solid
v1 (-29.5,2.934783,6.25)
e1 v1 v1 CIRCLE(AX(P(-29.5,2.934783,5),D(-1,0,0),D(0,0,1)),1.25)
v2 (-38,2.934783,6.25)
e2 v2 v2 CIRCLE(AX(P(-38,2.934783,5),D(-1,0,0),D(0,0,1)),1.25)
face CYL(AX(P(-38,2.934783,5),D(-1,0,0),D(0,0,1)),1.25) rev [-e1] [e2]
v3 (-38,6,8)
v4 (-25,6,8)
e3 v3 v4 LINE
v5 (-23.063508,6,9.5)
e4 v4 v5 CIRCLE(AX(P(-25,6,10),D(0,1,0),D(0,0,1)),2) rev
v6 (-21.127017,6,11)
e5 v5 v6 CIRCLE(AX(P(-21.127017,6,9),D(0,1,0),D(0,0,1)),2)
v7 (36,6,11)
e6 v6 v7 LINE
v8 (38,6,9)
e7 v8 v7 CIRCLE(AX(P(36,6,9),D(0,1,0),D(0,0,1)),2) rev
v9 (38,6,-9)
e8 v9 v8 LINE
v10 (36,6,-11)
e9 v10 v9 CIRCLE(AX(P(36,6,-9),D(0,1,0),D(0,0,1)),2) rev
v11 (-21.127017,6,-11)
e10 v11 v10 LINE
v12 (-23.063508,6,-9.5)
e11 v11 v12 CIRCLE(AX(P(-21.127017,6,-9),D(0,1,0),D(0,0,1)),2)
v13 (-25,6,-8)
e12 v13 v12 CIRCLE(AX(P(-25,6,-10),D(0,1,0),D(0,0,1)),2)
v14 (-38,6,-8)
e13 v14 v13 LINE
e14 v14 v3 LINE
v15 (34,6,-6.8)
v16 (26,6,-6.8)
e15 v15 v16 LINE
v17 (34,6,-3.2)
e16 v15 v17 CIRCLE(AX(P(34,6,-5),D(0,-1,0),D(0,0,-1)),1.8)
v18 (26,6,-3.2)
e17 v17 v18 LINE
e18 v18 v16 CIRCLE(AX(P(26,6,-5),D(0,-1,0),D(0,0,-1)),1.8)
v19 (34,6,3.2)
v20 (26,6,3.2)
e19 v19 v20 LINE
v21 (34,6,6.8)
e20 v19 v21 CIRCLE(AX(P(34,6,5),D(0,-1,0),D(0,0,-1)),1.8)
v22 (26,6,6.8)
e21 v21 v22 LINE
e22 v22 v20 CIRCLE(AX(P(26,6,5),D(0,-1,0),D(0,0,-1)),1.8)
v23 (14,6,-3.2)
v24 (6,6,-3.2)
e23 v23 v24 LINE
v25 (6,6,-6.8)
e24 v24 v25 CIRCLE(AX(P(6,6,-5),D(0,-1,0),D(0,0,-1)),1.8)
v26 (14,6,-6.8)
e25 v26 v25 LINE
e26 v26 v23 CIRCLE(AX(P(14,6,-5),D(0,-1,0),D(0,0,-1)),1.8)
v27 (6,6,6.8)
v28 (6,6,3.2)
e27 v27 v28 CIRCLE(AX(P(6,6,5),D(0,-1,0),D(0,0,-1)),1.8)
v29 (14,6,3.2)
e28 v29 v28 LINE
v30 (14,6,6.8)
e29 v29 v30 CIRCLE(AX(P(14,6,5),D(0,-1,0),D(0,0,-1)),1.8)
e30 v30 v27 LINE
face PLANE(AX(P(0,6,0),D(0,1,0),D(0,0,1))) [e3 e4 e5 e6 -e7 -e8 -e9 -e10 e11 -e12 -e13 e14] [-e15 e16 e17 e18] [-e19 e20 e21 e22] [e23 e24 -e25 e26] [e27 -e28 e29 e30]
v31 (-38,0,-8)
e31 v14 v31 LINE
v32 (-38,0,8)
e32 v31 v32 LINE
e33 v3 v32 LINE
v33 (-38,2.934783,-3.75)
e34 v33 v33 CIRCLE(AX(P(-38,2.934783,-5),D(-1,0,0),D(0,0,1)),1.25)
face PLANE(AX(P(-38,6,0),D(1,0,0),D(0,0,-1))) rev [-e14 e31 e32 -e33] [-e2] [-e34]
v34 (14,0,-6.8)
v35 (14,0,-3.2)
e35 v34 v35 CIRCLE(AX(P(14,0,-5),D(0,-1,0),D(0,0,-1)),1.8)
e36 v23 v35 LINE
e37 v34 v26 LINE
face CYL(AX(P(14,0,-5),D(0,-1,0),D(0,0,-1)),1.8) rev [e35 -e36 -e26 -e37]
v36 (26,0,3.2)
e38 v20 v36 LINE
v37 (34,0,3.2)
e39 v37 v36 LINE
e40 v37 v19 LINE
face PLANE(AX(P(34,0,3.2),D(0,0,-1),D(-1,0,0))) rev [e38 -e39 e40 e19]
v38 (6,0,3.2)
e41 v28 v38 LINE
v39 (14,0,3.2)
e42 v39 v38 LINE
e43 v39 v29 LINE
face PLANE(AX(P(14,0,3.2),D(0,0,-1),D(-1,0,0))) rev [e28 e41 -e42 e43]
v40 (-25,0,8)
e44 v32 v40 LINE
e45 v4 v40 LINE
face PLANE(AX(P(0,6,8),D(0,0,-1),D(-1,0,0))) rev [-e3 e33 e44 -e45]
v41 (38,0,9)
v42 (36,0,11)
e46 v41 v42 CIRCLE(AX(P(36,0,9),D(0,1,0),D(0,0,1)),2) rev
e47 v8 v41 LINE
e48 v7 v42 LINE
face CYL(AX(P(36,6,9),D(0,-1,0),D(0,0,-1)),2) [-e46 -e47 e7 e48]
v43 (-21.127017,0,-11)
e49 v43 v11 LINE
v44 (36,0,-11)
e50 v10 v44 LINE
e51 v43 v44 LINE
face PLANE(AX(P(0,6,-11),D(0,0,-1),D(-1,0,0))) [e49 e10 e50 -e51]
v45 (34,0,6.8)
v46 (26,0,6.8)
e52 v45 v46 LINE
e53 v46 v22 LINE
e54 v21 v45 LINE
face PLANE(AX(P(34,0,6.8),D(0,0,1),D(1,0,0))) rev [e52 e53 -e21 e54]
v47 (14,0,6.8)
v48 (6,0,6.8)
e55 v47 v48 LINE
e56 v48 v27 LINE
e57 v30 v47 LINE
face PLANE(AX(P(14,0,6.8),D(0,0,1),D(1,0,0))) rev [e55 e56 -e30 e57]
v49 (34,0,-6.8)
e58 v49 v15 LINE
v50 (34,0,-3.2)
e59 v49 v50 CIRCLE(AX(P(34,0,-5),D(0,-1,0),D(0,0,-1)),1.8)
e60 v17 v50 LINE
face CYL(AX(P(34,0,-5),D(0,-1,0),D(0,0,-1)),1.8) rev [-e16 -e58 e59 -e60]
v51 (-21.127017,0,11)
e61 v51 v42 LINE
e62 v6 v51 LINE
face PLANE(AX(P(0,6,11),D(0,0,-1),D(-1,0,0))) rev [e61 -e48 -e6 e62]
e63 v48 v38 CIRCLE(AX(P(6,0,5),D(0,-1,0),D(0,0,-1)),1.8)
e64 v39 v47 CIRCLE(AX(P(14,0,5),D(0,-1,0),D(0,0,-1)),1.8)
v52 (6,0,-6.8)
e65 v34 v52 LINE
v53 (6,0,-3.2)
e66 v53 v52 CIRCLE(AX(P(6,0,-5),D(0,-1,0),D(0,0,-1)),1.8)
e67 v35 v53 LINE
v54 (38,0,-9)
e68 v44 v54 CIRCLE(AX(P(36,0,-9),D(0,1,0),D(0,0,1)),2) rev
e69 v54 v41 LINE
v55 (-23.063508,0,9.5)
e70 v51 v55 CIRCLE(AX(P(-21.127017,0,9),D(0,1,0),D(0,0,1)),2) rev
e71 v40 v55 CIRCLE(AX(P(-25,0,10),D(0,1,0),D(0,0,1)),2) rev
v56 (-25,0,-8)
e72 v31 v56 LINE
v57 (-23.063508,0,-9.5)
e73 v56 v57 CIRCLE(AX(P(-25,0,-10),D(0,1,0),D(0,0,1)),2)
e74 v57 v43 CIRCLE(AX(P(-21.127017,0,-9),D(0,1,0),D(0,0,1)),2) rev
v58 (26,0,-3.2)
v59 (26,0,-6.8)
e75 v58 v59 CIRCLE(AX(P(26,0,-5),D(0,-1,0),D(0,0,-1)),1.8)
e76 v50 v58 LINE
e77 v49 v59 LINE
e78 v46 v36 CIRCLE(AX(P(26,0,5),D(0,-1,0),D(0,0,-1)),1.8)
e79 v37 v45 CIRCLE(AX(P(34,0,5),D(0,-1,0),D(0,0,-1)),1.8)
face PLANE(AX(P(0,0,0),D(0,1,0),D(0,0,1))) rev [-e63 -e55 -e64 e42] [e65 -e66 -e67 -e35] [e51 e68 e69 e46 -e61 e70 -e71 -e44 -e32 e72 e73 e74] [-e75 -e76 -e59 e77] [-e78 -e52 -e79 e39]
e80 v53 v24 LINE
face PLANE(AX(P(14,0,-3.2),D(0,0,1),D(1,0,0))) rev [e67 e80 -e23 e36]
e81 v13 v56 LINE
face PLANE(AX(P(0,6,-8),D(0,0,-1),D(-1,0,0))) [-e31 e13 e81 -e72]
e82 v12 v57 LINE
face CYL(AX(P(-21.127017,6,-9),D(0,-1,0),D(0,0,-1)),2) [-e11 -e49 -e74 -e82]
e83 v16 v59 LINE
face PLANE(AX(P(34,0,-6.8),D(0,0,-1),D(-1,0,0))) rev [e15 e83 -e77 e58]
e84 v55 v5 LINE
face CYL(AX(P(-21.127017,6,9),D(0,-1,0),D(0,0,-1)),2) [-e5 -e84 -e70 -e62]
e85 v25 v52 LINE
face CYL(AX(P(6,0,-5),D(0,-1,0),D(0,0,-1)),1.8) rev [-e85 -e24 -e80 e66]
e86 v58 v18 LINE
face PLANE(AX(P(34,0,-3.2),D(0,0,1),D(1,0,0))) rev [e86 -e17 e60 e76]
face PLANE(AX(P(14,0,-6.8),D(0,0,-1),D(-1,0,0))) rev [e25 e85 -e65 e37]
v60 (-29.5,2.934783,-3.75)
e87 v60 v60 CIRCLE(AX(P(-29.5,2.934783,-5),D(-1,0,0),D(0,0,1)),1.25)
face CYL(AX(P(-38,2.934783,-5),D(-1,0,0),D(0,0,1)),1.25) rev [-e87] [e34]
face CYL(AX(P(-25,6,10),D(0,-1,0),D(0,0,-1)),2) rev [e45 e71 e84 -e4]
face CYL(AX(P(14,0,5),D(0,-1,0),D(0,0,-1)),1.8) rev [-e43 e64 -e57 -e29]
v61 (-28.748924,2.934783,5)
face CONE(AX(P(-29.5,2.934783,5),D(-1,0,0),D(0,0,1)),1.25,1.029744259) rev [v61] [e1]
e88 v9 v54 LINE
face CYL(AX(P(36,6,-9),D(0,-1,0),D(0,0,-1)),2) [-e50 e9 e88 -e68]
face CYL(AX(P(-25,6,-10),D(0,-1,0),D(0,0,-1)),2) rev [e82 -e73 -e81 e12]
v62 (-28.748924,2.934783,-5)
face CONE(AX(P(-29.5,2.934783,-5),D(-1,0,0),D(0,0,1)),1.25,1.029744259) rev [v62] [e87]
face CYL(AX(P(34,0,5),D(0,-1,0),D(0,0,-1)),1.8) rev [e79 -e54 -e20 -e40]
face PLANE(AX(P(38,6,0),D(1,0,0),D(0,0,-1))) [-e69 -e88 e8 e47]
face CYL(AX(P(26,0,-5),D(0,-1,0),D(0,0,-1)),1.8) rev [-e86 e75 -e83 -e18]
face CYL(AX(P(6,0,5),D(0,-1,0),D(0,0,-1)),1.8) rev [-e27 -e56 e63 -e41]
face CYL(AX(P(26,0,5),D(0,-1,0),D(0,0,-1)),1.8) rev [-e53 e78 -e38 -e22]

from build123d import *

# Parameters (mm, degrees)
BOSS_EXTRUDE1_DEPTH      = 6
M3_CLEARANCE_SLOT1_DEPTH = 6
M3_TAPPED_HOLE1_D        = 2.5
M3_TAPPED_HOLE1_DEPTH    = 8.5
M3_TAPPED_HOLE1_TIP      = 0.751075774
FILLET1_R                = 2


# Read off the part's stored shape, not the designer's step: M3 Clearance Slot1
with BuildPart() as part:
    # Sketch1 → Boss-Extrude1 (new body)
    with BuildSketch(Plane(origin=(0, 0, 0), x_dir=(1, 0, 0), z_dir=(0, 1, 0))):
        with BuildLine():
            Line((36, 11), (-23, 11))
            Line((-23, 11), (-23, 10))
            ThreePointArc((-23, 10), (-23.585786438, 8.585786438), (-25, 8))
            Line((-25, 8), (-38, 8))
            Line((-38, 8), (-38, -8))
            Line((-38, -8), (-25, -8))
            ThreePointArc((-25, -8), (-23.585786438, -8.585786438), (-23, -10))
            Line((-23, -10), (-23, -11))
            Line((-23, -11), (36, -11))
            ThreePointArc((36, -11), (37.414213562, -10.414213562), (38, -9))
            Line((38, -9), (38, 9))
            ThreePointArc((38, 9), (37.414213562, 10.414213562), (36, 11))
        make_face()
    extrude(amount=BOSS_EXTRUDE1_DEPTH)

    # M3 Clearance Slot1 outline → M3 Clearance Slot1 (cut)
    with BuildSketch(Plane(origin=(0, 0, 0), x_dir=(1, 0, 0), z_dir=(0, 1, 0))):
        with BuildLine():
            ThreePointArc((6, 6.8), (4.2, 5), (6, 3.2))
            Line((6, 3.2), (14, 3.2))
            ThreePointArc((14, 3.2), (15.8, 5), (14, 6.8))
            Line((14, 6.8), (6, 6.8))
        make_face()
        with BuildLine():
            ThreePointArc((34, 3.2), (35.8, 5), (34, 6.8))
            Line((34, 6.8), (26, 6.8))
            ThreePointArc((26, 6.8), (24.2, 5), (26, 3.2))
            Line((26, 3.2), (34, 3.2))
        make_face()
        with BuildLine():
            ThreePointArc((6, -3.2), (4.2, -5), (6, -6.8))
            Line((6, -6.8), (14, -6.8))
            ThreePointArc((14, -6.8), (15.8, -5), (14, -3.2))
            Line((14, -3.2), (6, -3.2))
        make_face()
        with BuildLine():
            ThreePointArc((34, -6.8), (35.8, -5), (34, -3.2))
            Line((34, -3.2), (26, -3.2))
            ThreePointArc((26, -3.2), (24.2, -5), (26, -6.8))
            Line((26, -6.8), (34, -6.8))
        make_face()
    extrude(amount=M3_CLEARANCE_SLOT1_DEPTH, mode=Mode.SUBTRACT)

    # M3 Tapped Hole1
    with Locations(Plane.ZY.offset(38)):
        with Locations((-5, 2.934782609), (5, 2.934782609)):
            Hole(M3_TAPPED_HOLE1_D / 2, depth=M3_TAPPED_HOLE1_DEPTH)
            with Locations((0, 0, -(M3_TAPPED_HOLE1_DEPTH + M3_TAPPED_HOLE1_TIP / 2))):  # 118° drill point
                Cone(0, M3_TAPPED_HOLE1_D / 2, M3_TAPPED_HOLE1_TIP, mode=Mode.SUBTRACT)

    # Fillet1
    fillet1_edges = [part.edges().sort_by_distance(p)[0] for p in [
        (-23, 3, 11),
        (-23, 3, -11),
    ]]
    fillet(fillet1_edges, radius=FILLET1_R)


solid = part.part
